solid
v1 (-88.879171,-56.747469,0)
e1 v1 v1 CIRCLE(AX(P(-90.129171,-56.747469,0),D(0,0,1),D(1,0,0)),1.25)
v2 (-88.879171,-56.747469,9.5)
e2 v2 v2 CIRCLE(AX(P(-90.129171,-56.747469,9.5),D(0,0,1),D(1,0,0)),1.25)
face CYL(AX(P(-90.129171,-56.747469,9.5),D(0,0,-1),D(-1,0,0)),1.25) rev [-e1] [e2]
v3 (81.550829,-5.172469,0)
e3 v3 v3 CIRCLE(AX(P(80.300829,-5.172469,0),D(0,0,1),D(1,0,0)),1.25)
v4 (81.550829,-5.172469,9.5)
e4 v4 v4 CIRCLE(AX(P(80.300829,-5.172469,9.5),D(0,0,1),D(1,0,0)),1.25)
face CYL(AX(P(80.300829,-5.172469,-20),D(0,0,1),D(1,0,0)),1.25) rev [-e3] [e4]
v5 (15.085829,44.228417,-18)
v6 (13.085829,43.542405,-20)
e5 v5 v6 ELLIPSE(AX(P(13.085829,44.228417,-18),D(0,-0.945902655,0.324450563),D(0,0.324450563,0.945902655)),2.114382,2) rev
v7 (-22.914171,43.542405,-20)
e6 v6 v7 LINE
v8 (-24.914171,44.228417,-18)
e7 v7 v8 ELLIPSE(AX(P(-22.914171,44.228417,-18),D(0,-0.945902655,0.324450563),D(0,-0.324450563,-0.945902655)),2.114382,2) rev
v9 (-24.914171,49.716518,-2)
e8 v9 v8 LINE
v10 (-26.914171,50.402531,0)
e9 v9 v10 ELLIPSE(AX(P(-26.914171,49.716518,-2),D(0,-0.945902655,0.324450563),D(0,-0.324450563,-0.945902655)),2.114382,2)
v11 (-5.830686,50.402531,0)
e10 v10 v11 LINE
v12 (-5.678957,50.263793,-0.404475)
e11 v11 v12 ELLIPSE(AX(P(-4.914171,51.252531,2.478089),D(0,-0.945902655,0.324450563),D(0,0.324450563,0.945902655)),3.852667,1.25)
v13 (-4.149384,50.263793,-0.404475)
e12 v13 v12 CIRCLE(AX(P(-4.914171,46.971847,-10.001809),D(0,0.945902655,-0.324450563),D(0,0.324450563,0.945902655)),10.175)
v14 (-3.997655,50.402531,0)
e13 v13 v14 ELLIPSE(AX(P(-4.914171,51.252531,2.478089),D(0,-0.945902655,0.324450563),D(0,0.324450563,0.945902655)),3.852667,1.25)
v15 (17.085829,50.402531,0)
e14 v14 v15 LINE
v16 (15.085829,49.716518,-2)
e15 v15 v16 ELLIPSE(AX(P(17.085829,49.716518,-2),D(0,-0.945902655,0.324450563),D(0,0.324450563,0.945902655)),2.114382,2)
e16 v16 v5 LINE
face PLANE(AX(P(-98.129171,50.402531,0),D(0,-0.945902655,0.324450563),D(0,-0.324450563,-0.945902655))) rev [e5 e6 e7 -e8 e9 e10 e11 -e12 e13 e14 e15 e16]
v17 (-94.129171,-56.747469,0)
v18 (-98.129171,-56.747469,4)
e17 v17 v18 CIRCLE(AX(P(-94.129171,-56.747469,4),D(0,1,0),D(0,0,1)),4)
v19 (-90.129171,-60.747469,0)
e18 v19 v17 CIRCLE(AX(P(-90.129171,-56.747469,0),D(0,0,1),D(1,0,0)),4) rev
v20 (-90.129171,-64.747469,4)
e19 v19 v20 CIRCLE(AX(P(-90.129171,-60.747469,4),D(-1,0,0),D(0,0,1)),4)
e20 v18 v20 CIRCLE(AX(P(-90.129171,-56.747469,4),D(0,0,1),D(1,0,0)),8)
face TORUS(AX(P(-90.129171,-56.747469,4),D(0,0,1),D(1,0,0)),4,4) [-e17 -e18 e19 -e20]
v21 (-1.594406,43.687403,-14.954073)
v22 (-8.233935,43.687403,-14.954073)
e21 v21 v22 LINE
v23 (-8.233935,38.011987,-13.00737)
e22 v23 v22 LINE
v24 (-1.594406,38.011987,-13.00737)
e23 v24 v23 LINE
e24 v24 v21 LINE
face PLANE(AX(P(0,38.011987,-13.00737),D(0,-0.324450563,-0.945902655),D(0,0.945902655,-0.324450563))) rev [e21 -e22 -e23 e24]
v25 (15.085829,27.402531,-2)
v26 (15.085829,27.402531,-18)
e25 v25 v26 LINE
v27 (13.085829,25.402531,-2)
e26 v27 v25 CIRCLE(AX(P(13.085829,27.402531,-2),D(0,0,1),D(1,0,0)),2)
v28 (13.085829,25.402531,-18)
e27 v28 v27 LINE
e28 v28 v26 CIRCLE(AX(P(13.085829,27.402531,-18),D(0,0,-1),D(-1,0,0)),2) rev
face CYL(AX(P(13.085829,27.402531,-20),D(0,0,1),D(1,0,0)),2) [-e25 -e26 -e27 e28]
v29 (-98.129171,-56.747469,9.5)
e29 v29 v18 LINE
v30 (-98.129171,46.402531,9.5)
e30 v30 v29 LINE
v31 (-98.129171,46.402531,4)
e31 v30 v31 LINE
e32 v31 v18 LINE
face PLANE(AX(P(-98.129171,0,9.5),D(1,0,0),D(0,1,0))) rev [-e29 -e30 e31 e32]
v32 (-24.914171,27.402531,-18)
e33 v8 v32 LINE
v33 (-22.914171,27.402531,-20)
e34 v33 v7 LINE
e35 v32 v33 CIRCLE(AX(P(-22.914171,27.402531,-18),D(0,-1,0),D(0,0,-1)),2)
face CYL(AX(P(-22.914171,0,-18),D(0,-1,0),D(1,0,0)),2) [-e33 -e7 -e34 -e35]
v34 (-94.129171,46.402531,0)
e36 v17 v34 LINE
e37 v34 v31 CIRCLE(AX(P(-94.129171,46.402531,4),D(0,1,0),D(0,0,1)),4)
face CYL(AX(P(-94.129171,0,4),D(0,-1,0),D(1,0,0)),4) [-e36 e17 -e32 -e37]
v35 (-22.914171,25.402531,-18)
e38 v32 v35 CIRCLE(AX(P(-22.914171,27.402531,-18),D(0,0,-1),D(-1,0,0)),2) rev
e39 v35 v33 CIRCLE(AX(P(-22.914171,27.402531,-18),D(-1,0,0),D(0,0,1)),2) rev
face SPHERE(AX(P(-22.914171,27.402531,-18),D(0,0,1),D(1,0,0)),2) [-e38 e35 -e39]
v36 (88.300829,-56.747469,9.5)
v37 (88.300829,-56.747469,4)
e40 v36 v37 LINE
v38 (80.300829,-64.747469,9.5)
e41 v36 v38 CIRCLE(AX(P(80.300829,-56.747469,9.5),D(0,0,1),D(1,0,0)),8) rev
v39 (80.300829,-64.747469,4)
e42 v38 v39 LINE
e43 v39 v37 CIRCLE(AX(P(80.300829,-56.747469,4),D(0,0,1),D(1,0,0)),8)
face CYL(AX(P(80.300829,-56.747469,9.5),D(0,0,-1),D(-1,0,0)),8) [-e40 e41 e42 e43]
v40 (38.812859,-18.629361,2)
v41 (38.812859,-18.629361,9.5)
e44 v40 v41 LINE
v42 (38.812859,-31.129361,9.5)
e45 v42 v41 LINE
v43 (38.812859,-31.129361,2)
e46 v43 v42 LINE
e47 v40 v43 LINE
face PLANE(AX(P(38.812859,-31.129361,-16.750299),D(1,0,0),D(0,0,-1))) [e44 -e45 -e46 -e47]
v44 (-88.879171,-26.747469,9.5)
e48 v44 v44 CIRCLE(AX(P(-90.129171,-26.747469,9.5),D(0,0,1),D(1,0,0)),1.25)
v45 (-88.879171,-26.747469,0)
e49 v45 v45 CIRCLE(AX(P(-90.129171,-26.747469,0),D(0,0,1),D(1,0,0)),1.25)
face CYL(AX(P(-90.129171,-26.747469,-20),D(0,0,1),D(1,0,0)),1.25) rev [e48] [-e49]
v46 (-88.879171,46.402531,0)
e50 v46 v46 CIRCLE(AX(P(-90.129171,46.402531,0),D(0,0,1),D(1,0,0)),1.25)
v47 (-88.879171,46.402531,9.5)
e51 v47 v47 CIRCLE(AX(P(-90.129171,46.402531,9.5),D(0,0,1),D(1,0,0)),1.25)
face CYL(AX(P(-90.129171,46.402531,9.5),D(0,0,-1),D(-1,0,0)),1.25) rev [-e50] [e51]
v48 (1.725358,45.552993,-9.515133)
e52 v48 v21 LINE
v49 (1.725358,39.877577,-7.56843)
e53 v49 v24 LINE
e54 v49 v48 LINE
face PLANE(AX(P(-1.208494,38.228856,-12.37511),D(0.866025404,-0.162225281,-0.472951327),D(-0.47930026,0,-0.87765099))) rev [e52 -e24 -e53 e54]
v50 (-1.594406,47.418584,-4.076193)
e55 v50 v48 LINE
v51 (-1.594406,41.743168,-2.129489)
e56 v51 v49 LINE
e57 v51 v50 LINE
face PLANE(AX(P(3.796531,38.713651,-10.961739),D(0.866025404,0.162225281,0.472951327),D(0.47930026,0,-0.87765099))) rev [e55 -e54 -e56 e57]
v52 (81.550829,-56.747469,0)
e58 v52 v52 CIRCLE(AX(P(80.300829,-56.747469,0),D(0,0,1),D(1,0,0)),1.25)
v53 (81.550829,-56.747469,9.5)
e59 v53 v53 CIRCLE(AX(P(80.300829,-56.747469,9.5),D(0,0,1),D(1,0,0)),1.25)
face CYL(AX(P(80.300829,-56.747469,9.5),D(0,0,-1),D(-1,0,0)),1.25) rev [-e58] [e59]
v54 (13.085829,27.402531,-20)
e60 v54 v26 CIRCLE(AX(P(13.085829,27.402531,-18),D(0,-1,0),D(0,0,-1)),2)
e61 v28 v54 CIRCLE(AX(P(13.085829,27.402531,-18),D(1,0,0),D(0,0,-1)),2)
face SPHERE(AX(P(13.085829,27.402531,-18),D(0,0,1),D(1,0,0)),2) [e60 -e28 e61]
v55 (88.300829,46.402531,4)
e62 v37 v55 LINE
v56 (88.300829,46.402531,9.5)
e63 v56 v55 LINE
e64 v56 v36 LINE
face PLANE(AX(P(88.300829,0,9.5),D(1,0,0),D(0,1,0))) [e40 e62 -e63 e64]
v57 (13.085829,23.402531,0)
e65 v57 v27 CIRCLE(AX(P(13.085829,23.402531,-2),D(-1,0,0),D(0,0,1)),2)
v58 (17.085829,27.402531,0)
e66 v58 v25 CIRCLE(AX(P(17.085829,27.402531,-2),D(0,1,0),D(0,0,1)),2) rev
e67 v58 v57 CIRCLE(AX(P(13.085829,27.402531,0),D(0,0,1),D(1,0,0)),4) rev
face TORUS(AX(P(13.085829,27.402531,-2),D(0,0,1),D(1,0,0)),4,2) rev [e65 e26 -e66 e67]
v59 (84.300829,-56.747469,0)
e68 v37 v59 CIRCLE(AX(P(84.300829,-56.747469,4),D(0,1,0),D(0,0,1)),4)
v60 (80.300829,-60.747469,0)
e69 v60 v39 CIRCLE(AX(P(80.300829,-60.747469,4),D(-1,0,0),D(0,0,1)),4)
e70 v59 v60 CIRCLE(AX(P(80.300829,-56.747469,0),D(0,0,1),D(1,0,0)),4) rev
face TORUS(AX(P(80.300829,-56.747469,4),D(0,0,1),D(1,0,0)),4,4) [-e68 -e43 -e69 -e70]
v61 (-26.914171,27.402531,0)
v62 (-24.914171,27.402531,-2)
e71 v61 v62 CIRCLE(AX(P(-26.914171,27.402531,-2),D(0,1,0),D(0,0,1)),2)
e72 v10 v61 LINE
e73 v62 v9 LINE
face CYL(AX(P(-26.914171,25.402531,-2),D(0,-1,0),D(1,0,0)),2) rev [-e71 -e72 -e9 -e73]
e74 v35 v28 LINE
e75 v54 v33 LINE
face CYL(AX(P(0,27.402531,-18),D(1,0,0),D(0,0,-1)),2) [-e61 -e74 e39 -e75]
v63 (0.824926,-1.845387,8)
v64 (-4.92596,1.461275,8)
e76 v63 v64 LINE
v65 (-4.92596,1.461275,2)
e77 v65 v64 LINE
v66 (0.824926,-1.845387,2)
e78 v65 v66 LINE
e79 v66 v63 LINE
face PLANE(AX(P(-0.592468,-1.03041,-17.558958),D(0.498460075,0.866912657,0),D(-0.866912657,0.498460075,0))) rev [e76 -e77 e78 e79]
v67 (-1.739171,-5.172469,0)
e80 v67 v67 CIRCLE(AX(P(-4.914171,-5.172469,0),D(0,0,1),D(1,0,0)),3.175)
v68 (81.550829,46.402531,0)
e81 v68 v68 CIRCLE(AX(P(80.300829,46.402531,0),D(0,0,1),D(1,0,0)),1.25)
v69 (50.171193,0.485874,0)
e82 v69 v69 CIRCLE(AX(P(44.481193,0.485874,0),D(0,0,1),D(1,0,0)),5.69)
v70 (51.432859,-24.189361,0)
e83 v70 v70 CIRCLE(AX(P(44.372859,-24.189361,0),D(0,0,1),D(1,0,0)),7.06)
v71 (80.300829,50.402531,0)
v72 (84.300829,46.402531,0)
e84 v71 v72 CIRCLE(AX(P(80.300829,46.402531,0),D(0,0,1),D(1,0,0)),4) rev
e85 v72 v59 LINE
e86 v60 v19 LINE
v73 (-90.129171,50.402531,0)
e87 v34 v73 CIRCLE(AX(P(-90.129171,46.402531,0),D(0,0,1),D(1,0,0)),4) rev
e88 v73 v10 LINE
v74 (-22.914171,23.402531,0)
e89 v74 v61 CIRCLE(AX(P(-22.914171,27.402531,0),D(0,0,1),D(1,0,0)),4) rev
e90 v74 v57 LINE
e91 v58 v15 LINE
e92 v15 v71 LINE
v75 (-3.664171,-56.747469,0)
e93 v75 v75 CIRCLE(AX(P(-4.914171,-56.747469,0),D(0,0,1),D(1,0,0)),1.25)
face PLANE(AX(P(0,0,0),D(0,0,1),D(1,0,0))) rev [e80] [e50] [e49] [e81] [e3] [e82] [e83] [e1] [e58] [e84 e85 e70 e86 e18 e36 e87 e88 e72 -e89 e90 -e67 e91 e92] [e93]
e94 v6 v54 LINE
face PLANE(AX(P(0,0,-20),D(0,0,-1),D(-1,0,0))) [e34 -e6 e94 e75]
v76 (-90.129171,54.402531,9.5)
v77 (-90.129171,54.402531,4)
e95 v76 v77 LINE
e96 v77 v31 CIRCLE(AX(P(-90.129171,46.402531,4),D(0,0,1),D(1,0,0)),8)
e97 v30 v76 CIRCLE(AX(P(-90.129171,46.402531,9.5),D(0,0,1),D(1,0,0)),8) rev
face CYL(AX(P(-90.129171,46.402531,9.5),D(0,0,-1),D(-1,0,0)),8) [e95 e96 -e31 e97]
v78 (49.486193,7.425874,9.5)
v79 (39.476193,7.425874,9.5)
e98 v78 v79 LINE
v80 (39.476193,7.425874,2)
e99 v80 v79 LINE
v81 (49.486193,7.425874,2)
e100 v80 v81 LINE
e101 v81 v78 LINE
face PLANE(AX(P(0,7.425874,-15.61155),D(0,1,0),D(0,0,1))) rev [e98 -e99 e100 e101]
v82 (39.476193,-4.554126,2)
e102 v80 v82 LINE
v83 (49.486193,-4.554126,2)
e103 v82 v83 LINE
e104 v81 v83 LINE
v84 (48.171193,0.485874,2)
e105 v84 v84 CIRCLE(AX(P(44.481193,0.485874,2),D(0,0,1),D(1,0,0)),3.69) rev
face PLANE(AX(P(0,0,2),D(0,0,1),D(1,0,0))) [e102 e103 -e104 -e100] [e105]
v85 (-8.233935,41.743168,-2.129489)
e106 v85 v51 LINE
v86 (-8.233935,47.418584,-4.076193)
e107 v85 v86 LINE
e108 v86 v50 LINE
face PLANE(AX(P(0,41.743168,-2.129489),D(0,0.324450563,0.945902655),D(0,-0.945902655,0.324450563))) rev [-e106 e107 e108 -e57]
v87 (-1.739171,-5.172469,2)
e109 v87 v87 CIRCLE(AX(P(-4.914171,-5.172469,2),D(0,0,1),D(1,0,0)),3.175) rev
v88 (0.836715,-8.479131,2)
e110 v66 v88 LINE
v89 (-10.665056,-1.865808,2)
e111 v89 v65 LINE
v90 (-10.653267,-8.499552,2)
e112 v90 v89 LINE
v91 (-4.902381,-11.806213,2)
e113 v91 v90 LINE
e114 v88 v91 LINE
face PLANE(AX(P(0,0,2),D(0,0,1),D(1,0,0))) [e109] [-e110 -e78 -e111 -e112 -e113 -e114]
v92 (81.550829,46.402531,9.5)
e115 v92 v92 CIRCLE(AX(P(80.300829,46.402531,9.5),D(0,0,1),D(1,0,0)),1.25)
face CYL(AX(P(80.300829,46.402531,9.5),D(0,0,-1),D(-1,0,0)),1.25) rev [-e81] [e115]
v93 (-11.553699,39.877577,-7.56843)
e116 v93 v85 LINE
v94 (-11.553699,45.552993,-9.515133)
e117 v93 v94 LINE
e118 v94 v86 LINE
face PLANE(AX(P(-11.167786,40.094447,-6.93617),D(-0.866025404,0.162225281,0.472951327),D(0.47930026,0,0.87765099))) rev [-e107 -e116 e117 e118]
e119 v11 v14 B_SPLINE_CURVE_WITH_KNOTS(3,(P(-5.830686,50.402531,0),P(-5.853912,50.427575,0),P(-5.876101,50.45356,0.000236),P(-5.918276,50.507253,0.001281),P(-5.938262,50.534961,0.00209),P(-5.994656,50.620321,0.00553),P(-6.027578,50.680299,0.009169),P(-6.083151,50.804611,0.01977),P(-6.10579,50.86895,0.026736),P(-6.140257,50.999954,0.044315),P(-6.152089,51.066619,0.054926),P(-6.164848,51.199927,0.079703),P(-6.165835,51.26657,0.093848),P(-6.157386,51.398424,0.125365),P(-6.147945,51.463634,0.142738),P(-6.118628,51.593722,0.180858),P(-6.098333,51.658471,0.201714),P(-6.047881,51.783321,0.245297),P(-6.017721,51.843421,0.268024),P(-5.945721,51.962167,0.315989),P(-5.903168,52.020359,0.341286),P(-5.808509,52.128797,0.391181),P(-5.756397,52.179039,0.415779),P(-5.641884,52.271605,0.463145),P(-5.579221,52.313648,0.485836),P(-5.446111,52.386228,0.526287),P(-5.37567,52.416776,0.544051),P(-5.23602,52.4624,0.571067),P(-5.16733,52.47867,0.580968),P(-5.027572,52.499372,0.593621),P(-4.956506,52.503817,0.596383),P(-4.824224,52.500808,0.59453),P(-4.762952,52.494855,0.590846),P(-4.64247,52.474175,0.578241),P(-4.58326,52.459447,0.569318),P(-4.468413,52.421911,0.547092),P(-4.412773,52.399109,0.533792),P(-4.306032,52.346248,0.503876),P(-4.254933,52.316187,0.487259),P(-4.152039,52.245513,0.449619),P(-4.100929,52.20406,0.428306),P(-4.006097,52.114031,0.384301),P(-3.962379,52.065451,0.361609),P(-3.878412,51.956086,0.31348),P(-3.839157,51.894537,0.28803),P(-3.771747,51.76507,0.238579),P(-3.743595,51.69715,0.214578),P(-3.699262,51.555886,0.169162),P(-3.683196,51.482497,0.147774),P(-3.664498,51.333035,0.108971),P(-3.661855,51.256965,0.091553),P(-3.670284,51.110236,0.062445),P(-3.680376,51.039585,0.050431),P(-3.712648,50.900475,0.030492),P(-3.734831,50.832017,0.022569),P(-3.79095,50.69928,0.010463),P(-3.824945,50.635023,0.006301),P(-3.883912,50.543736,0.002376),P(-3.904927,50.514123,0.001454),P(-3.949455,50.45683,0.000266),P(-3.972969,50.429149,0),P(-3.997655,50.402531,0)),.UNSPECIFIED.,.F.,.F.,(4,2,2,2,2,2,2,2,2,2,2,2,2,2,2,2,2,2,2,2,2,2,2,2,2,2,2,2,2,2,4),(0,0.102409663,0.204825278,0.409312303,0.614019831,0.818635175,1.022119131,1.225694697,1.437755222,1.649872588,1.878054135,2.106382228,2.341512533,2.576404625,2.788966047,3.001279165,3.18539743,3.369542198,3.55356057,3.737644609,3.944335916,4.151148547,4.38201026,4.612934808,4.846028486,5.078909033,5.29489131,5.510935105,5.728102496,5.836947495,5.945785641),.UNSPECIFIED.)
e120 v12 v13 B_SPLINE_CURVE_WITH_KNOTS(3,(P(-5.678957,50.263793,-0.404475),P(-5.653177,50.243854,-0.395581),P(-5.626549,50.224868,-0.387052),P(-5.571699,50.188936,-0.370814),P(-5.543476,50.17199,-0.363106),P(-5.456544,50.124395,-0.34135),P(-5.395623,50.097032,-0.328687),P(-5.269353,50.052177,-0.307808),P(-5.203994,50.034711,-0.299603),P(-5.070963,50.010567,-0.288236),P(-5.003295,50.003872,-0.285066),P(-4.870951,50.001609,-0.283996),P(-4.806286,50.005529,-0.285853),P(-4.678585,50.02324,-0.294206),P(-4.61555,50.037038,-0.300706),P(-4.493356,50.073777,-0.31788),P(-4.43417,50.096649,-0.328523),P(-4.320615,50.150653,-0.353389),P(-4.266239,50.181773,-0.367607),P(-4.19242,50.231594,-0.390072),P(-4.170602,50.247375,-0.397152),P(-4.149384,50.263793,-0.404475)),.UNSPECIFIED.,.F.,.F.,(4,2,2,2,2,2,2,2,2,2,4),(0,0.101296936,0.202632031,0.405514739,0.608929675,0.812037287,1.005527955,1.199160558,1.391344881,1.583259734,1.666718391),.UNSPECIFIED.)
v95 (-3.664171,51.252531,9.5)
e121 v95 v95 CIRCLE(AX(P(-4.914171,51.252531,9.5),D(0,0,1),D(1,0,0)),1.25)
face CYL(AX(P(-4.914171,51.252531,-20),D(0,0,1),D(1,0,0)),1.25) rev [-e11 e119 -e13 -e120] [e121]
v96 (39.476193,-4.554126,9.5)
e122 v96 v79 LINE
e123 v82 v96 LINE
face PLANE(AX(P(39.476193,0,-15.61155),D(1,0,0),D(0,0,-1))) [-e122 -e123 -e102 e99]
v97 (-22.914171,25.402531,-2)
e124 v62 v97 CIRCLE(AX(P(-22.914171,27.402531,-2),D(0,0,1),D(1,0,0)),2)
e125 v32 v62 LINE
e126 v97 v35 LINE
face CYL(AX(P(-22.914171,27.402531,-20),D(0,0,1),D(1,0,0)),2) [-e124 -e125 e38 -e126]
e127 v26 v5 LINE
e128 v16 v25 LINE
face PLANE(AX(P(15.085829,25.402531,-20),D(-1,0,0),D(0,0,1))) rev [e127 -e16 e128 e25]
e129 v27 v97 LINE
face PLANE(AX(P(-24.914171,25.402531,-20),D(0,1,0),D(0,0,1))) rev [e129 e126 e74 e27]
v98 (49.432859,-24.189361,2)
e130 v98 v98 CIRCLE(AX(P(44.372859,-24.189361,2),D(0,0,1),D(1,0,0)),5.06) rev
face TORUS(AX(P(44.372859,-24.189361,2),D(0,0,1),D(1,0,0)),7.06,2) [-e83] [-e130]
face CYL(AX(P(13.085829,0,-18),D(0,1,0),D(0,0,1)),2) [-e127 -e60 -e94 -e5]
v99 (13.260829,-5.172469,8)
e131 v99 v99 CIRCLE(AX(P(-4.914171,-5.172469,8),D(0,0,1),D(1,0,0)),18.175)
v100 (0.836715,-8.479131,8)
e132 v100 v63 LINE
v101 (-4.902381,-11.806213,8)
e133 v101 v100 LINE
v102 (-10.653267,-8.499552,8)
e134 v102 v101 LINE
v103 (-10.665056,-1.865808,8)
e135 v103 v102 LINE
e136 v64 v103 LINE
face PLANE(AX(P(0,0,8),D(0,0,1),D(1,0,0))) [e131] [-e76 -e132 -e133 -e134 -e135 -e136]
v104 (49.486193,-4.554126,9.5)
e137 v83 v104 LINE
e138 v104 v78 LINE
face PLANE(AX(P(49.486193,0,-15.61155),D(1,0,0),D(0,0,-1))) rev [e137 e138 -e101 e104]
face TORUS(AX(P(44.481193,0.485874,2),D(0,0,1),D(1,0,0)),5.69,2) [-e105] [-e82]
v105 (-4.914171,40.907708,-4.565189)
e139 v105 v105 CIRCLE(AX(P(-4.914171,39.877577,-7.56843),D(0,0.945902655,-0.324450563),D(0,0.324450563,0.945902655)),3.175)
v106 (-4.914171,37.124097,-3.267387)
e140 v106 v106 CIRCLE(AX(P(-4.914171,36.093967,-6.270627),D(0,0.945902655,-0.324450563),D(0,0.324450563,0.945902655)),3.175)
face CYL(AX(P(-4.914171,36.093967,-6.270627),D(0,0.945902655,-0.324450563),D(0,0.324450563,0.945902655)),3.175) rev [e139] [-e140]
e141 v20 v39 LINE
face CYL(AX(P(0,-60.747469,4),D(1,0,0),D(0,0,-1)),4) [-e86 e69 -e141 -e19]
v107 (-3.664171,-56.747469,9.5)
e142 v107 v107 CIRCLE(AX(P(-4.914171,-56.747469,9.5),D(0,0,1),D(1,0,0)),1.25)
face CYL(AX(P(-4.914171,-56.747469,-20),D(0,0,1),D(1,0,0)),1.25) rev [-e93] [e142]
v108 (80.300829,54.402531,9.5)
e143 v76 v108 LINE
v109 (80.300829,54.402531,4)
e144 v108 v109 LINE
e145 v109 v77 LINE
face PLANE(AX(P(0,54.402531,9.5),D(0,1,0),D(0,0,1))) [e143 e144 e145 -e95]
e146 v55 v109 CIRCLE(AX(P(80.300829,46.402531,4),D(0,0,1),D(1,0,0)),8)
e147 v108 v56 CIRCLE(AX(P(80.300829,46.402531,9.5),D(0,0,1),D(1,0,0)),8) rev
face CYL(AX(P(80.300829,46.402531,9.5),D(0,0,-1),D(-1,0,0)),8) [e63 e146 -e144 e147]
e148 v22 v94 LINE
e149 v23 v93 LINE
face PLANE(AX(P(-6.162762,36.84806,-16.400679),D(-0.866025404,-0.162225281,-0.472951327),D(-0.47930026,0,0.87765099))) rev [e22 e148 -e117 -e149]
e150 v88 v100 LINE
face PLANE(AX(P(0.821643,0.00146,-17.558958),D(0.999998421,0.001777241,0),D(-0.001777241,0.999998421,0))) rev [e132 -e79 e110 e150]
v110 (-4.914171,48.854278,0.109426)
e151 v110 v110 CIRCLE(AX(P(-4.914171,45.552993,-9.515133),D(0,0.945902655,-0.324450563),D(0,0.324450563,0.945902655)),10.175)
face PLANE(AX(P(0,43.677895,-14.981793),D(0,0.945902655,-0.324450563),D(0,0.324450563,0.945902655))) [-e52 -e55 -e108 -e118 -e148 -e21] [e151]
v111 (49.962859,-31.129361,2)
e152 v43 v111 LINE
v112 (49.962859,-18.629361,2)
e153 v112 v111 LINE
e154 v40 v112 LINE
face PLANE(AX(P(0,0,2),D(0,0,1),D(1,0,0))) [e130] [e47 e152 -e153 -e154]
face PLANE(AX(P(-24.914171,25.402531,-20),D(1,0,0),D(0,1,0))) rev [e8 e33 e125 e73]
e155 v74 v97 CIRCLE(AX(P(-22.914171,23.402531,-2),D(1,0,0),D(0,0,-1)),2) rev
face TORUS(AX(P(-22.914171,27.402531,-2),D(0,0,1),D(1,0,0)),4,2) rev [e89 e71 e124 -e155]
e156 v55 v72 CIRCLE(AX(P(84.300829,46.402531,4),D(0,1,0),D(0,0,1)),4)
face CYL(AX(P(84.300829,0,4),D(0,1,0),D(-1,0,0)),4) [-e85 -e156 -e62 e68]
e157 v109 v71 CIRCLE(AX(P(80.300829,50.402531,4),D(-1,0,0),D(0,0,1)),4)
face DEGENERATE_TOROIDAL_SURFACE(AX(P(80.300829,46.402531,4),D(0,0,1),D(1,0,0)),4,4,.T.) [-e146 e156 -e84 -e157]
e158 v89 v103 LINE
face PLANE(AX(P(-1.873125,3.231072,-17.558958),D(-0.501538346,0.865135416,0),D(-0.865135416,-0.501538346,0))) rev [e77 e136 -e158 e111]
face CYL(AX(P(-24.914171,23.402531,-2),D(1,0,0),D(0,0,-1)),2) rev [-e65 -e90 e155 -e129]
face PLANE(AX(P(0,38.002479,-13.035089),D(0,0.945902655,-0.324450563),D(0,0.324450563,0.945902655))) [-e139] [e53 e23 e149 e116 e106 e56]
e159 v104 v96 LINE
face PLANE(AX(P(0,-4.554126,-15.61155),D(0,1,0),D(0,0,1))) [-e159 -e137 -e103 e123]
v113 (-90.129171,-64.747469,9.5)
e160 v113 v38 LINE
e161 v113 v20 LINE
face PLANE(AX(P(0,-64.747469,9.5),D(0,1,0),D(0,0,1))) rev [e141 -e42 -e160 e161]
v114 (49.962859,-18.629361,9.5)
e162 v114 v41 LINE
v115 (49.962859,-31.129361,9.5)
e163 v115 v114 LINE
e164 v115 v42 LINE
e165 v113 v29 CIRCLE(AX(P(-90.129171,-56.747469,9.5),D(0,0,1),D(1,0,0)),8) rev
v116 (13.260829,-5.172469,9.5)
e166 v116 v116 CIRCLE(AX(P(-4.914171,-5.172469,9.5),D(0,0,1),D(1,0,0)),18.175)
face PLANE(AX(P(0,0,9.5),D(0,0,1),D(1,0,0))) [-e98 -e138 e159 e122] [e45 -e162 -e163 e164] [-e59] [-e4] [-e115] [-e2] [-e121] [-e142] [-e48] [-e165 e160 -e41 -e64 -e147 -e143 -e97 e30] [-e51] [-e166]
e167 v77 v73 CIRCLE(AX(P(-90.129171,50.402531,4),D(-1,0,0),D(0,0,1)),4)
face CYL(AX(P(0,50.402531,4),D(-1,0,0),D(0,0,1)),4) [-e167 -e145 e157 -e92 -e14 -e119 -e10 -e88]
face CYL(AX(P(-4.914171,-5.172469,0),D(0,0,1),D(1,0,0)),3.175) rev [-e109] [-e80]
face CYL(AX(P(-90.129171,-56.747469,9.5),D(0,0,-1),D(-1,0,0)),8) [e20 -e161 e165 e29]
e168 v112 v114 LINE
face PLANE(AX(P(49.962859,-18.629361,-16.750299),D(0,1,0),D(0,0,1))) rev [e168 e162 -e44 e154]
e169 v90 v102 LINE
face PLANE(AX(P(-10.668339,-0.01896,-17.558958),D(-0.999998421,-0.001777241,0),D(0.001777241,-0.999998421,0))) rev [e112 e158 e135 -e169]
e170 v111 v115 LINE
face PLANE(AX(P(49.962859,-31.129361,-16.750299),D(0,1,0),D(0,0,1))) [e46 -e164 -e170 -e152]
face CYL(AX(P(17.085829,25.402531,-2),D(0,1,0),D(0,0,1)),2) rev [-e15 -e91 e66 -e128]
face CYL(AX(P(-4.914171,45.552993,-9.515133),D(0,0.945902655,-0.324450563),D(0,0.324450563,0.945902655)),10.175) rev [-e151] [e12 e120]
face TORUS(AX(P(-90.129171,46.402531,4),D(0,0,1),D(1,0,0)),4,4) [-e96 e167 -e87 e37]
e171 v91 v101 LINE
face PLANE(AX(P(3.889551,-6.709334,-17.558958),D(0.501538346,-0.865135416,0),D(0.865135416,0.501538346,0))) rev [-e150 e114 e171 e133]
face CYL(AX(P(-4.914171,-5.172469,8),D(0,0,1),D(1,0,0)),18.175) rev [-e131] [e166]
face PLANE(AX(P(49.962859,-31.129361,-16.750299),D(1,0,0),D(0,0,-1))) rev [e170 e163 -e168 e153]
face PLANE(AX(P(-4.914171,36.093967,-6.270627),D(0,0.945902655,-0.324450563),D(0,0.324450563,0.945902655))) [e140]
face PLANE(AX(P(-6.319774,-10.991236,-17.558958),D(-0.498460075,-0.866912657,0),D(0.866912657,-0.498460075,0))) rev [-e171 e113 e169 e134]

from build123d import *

# Parameters (mm, degrees)
SKETCH1_R            = 1.25
SKETCH1_W            = 156.43
SKETCH1_H            = 89.15
SKETCH1_W_2          = 17.19
SKETCH1_H_2          = 1
SKETCH1_H_3          = 0.5
SKETCH1_W_3          = 1
SKETCH1_H_4          = 11.97
SKETCH1_W_4          = 0.5
SKETCH1_W_5          = 2
BOSS_EXTRUDE3_DEPTH  = 9.5
FILLET2_R            = 4
SKETCH9_R            = 5.06
CUT_EXTRUDE5_DEPTH   = 118.948373888
SKETCH9_3_W          = 11.15
SKETCH9_3_H          = 12.5
CUT_EXTRUDE6_DEPTH   = 7.5
SKETCH10_R           = 3.69
SKETCH10_R_2         = 3.19
CUT_EXTRUDE7_DEPTH   = 118.948373888
SKETCH10_3_W         = 10.01
SKETCH10_3_H         = 11.98
SKETCH10_3_W_2       = 9.01
SKETCH10_3_H_2       = 10.98
SKETCH10_3_R         = 3.69
CUT_EXTRUDE8_DEPTH   = 7.5
FILLET3_R            = 2
SKETCH12_R           = 3.175
CUT_EXTRUDE9_DEPTH   = 118.948373888
SKETCH12_3_R         = 3.175
CUT_EXTRUDE10_DEPTH  = 7.5
SKETCH12_4_R         = 18.175
CUT_EXTRUDE11_DEPTH  = 1.5
SKETCH13_W           = 40
SKETCH13_H           = 25
BOSS_EXTRUDE10_DEPTH = 20
CUT_EXTRUDE12_DEPTH  = 132.946470296
SKETCH15_R           = 10.175
SKETCH15_R_2         = 3.175
CUT_EXTRUDE13_DEPTH  = 1.5
CUT_EXTRUDE14_START  = -1.5
SKETCH15_3_R         = 3.175
CUT_EXTRUDE14_DEPTH  = 6
CUT_EXTRUDE15_START  = -7.5
SKETCH15_5_R         = 3.175
CUT_EXTRUDE15_DEPTH  = 4
SKETCH16_R           = 1.25
CUT_EXTRUDE16_DEPTH  = 122.209813559
FILLET4_R            = 2


# Some blends are built 0.0001 mm under size
with BuildPart() as part:
    # Sketch1 → Boss-Extrude3 (new body)
    # profile 1 of 11: a face of its own
    with BuildSketch(Plane.XY):
        with BuildLine():
            ThreePointArc((-90.129170507, 54.402530662), (-95.786024756, 52.059384912), (-98.129170507, 46.402530662))
            Line((-98.129170507, 46.402530662), (-98.129170507, -56.747469338))
            ThreePointArc((-98.129170507, -56.747469338), (-95.786024756, -62.404323587), (-90.129170507, -64.747469338))
            Line((-90.129170507, -64.747469338), (80.300829493, -64.747469338))
            ThreePointArc((80.300829493, -64.747469338), (85.957683743, -62.404323587), (88.300829493, -56.747469338))
            Line((88.300829493, -56.747469338), (88.300829493, 46.402530662))
            ThreePointArc((88.300829493, 46.402530662), (85.957683743, 52.059384912), (80.300829493, 54.402530662))
            Line((80.300829493, 54.402530662), (-90.129170507, 54.402530662))
        make_face()
        with Locations((-90.129170507, -56.747469338)):
            Circle(SKETCH1_R, mode=Mode.SUBTRACT)
        with Locations((80.300829493, -56.747469338)):
            Circle(SKETCH1_R, mode=Mode.SUBTRACT)
        with BuildLine():
            Line((-89.239170507, -53.907469338), (-89.239170507, 45.524806332))
            ThreePointArc((-89.239170507, 45.524806332), (-91.378326538, 46.448456797), (-89.177120088, 47.212530662))
            Line((-89.177120088, 47.212530662), (-38.909170507, 47.212530662))
            Line((-38.909170507, 47.212530662), (-38.909170507, 48.212530662))
            Line((-38.909170507, 48.212530662), (-21.719170507, 48.212530662))
            Line((-21.719170507, 48.212530662), (-21.719170507, 47.212530662))
            Line((-21.719170507, 47.212530662), (76.680829493, 47.212530662))
            Line((76.680829493, 47.212530662), (76.680829493, -0.147469338))
            Line((76.680829493, -0.147469338), (77.680829493, -0.147469338))
            Line((77.680829493, -0.147469338), (77.680829493, -12.117469338))
            Line((77.680829493, -12.117469338), (76.680829493, -12.117469338))
            Line((76.680829493, -12.117469338), (76.680829493, -53.907469338))
            Line((76.680829493, -53.907469338), (-89.239170507, -53.907469338))
        make_face(mode=Mode.SUBTRACT)
        with Locations((80.300829493, 46.402530662)):
            Circle(SKETCH1_R, mode=Mode.SUBTRACT)
    # profile 2 of 11: a face of its own
    with BuildSketch(Plane.XY):
        with BuildLine():
            ThreePointArc((-88.879170507, 46.402530662), (-88.972667156, 45.928189013), (-89.239170507, 45.524806332))
            Line((-89.239170507, 45.524806332), (-89.239170507, -53.907469338))
            Line((-89.239170507, -53.907469338), (76.680829493, -53.907469338))
            Line((76.680829493, -53.907469338), (76.680829493, -12.117469338))
            Line((76.680829493, -12.117469338), (76.180829493, -12.117469338))
            Line((76.180829493, -12.117469338), (76.180829493, -53.407469338))
            Line((76.180829493, -53.407469338), (-88.739170507, -53.407469338))
            Line((-88.739170507, -53.407469338), (-88.739170507, 46.712530662))
            Line((-88.739170507, 46.712530662), (-38.909170507, 46.712530662))
            Line((-38.909170507, 46.712530662), (-38.909170507, 47.212530662))
            Line((-38.909170507, 47.212530662), (-89.177120088, 47.212530662))
            ThreePointArc((-89.177120088, 47.212530662), (-88.956020256, 46.834061065), (-88.879170507, 46.402530662))
        make_face()
    # profile 3 of 11: a face of its own
    with BuildSketch(Plane.XY):
        Polygon((-38.909170507, 46.212530662), (-38.909170507, 46.712530662), (-88.739170507, 46.712530662), (-88.739170507, -53.407469338), (76.180829493, -53.407469338), (76.180829493, -12.117469338), (74.180829493, -12.117469338), (74.180829493, -0.147469338), (76.180829493, -0.147469338), (76.180829493, 46.712530662), (-21.719170507, 46.712530662), (-21.719170507, 46.212530662), align=None)
        with Locations((-4.914170507, -5.172469338)):
            Rectangle(SKETCH1_W, SKETCH1_H, mode=Mode.SUBTRACT)
    # profile 4 of 11: a face of its own
    with BuildSketch(Plane.XY):
        with Locations((-4.914170507, -5.172469338)):
            Rectangle(SKETCH1_W, SKETCH1_H)
    # profile 5 of 11: a face of its own
    with BuildSketch(Plane.XY):
        Polygon((76.680829493, 47.212530662), (-21.719170507, 47.212530662), (-21.719170507, 46.712530662), (76.180829493, 46.712530662), (76.180829493, -0.147469338), (76.680829493, -0.147469338), align=None)
    # profile 6 of 11: a face of its own
    with BuildSketch(Plane.XY):
        with Locations((-30.314170507, 47.712530662)):
            Rectangle(SKETCH1_W_2, SKETCH1_H_2)
    # profile 7 of 11: a face of its own
    with BuildSketch(Plane.XY):
        with Locations((-30.314170507, 46.962530662)):
            Rectangle(SKETCH1_W_2, SKETCH1_H_3)
    # profile 8 of 11: a face of its own
    with BuildSketch(Plane.XY):
        with Locations((-30.314170507, 46.462530662)):
            Rectangle(SKETCH1_W_2, SKETCH1_H_3)
    # profile 9 of 11: a face of its own
    with BuildSketch(Plane.XY):
        with Locations((77.180829493, -6.132469338)):
            Rectangle(SKETCH1_W_3, SKETCH1_H_4)
    # profile 10 of 11: a face of its own
    with BuildSketch(Plane.XY):
        with Locations((76.430829493, -6.132469338)):
            Rectangle(SKETCH1_W_4, SKETCH1_H_4)
    # profile 11 of 11: a face of its own
    with BuildSketch(Plane.XY):
        with Locations((75.180829493, -6.132469338)):
            Rectangle(SKETCH1_W_5, SKETCH1_H_4)
    extrude(amount=BOSS_EXTRUDE3_DEPTH)

    # Fillet2
    fillet2_edges = [part.edges().sort_by_distance(p)[0] for p in [
        (88.300829493, -5.172469338, 0),
        (85.957683743, -62.404323587, 0),
        (-4.914170507, -64.747469338, 0),
        (-95.786024756, -62.404323587, 0),
        (-98.129170507, -5.172469338, 0),
        (-95.786024756, 52.059384912, 0),
        (-4.914170507, 54.402530662, 0),
        (85.957683743, 52.059384912, 0),
    ]]
    fillet(fillet2_edges, radius=FILLET2_R)

    # Sketch9 → Cut-Extrude5 (cut, through all)
    with BuildSketch(Plane.XY.offset(9.5)):
        with Locations((44.372859259, -24.18936125)):
            Circle(SKETCH9_R)
    extrude(amount=-CUT_EXTRUDE5_DEPTH, mode=Mode.SUBTRACT)

    # Sketch9<3> → Cut-Extrude6 (cut)
    with BuildSketch(Plane.XY.offset(9.5)):
        with Locations((44.387859259, -24.87936125)):
            Rectangle(SKETCH9_3_W, SKETCH9_3_H)
    extrude(amount=-CUT_EXTRUDE6_DEPTH, mode=Mode.SUBTRACT)

    # Sketch10 → Cut-Extrude7 (cut, through all)
    # profile 1 of 2: a face of its own
    with BuildSketch(Plane.XY.offset(9.5)):
        with Locations((44.481193334, 0.485874053)):
            Circle(SKETCH10_R)
        with Locations((44.481193334, 0.485874053)):
            Circle(SKETCH10_R_2, mode=Mode.SUBTRACT)
    # profile 2 of 2: a face of its own
    with BuildSketch(Plane.XY.offset(9.5)):
        with Locations((44.481193334, 0.485874053)):
            Circle(SKETCH10_R_2)
    extrude(amount=-CUT_EXTRUDE7_DEPTH, mode=Mode.SUBTRACT)

    # Sketch10<3> → Cut-Extrude8 (cut)
    # profile 1 of 2: a face of its own
    with BuildSketch(Plane.XY.offset(9.5)):
        with Locations((44.481193334, 1.435874053)):
            Rectangle(SKETCH10_3_W, SKETCH10_3_H)
        with Locations((44.481193334, 1.435874053)):
            Rectangle(SKETCH10_3_W_2, SKETCH10_3_H_2, mode=Mode.SUBTRACT)
    # profile 2 of 2: a face of its own
    with BuildSketch(Plane.XY.offset(9.5)):
        with Locations((44.481193334, 1.435874053)):
            Rectangle(SKETCH10_3_W_2, SKETCH10_3_H_2)
        with Locations((44.481193334, 0.485874053)):
            Circle(SKETCH10_3_R, mode=Mode.SUBTRACT)
    extrude(amount=-CUT_EXTRUDE8_DEPTH, mode=Mode.SUBTRACT)

    # Fillet3
    fillet3_edges = [part.edges().sort_by_distance(p)[0] for p in [
        (39.312859259, -24.18936125, 0),
        (40.791193334, 0.485874053, 0),
    ]]
    fillet(fillet3_edges, radius=FILLET3_R - 0.0001)  # a hair under: the kernel refuses the full size

    # Sketch12 → Cut-Extrude9 (cut, through all)
    with BuildSketch(Plane.XY.offset(9.5)):
        with Locations((-4.914170507, -5.172469338)):
            Circle(SKETCH12_R)
    extrude(amount=-CUT_EXTRUDE9_DEPTH, mode=Mode.SUBTRACT)

    # Sketch12<3> → Cut-Extrude10 (cut)
    # profile 1 of 2: a face of its own
    with BuildSketch(Plane.XY.offset(9.5)):
        Polygon((-10.653266544, -8.499551645), (-4.902380726, -11.806213454), (0.83671531, -8.479131146), (0.82492553, -1.84538703), (-4.925960287, 1.461274779), (-10.665056324, -1.865807529), align=None)
        Polygon((-4.902893772, -11.517538775), (0.586459182, -8.335238117), (0.575182447, -1.990168679), (-4.925447242, 1.1726001), (-10.414800196, -2.009700558), (-10.403523461, -8.354769996), align=None, mode=Mode.SUBTRACT)
    # profile 2 of 2: a face of its own
    with BuildSketch(Plane.XY.offset(9.5)):
        Polygon((-10.403523461, -8.354769996), (-4.902893772, -11.517538775), (0.586459182, -8.335238117), (0.575182447, -1.990168679), (-4.925447242, 1.1726001), (-10.414800196, -2.009700558), align=None)
        with Locations((-4.914170507, -5.172469338)):
            Circle(SKETCH12_3_R, mode=Mode.SUBTRACT)
    extrude(amount=-CUT_EXTRUDE10_DEPTH, mode=Mode.SUBTRACT)

    # Sketch12<4> → Cut-Extrude11 (cut)
    with BuildSketch(Plane.XY.offset(9.5)):
        with Locations((-4.914170507, -5.172469338)):
            Circle(SKETCH12_4_R)
        Polygon((-4.902380726, -11.806213454), (0.83671531, -8.479131146), (0.82492553, -1.84538703), (-4.925960287, 1.461274779), (-10.665056324, -1.865807529), (-10.653266544, -8.499551645), align=None, mode=Mode.SUBTRACT)
    extrude(amount=-CUT_EXTRUDE11_DEPTH, mode=Mode.SUBTRACT)

    # Sketch13 → Boss-Extrude10 (add)
    with BuildSketch(Plane(origin=(0, 0, 0), x_dir=(-1, 0, 0), z_dir=(0, 0, -1))):
        with Locations((4.914170507, 37.902530662)):
            Rectangle(SKETCH13_W, SKETCH13_H)
    extrude(amount=BOSS_EXTRUDE10_DEPTH)

    # Sketch14 → Cut-Extrude12 (cut, through all)
    with BuildSketch(Plane(origin=(15.085829493, 0, 0), x_dir=(0, 0, -1), z_dir=(1, 0, 0))):
        Polygon((0, 50.402530662), (20, 43.542404813), (20, 50.402530662), align=None)
    extrude(amount=-CUT_EXTRUDE12_DEPTH, mode=Mode.SUBTRACT)

    # Sketch15 → Cut-Extrude13 (cut)
    # profile 1 of 4: a face of its own
    with BuildSketch(Plane(origin=(0, 45.096748617, -15.468468545), x_dir=(1, 0, 0), z_dir=(0, 0.9459026548151281, -0.32445056266508826))):
        with Locations(Location((-4.914170507, -5.779304645, 0), (0, 0, 270))):
            Circle(SKETCH15_R)
        Polygon((-1.594406459, -11.529304645), (1.725357589, -5.779304645), (-1.594406459, -0.029304645), (-8.233934555, -0.029304645), (-11.553698603, -5.779304645), (-8.233934555, -11.529304645), align=None, mode=Mode.SUBTRACT)
    # profile 2 of 4: a face of its own
    with BuildSketch(Plane(origin=(0, 45.096748617, -15.468468545), x_dir=(1, 0, 0), z_dir=(0, 0.9459026548151281, -0.32445056266508826))):
        Polygon((-8.233934555, -11.529304645), (-1.594406459, -11.529304645), (1.725357589, -5.779304645), (-1.594406459, -0.029304645), (-8.233934555, -0.029304645), (-11.553698603, -5.779304645), align=None)
        Polygon((-1.738744026, -11.279304645), (1.436682454, -5.779304645), (-1.738744026, -0.279304645), (-8.089596987, -0.279304645), (-11.265023468, -5.779304645), (-8.089596987, -11.279304645), align=None, mode=Mode.SUBTRACT)
    # profile 3 of 4: a face of its own
    with BuildSketch(Plane(origin=(0, 45.096748617, -15.468468545), x_dir=(1, 0, 0), z_dir=(0, 0.9459026548151281, -0.32445056266508826))):
        Polygon((-8.089596987, -11.279304645), (-1.738744026, -11.279304645), (1.436682454, -5.779304645), (-1.738744026, -0.279304645), (-8.089596987, -0.279304645), (-11.265023468, -5.779304645), align=None)
        with Locations((-4.914170507, -5.779304645)):
            Circle(SKETCH15_R_2, mode=Mode.SUBTRACT)
    # profile 4 of 4: a face of its own
    with BuildSketch(Plane(origin=(0, 45.096748617, -15.468468545), x_dir=(1, 0, 0), z_dir=(0, 0.9459026548151281, -0.32445056266508826))):
        with Locations((-4.914170507, -5.779304645)):
            Circle(SKETCH15_R_2)
    extrude(amount=-CUT_EXTRUDE13_DEPTH, mode=Mode.SUBTRACT)

    # Sketch15<3> → Cut-Extrude14 (cut)
    # profile 1 of 3: a face of its own
    with BuildSketch(Plane(origin=(0, 45.096748617, -15.468468545), x_dir=(1, 0, 0), z_dir=(0, 0.9459026548151281, -0.32445056266508826)).offset(CUT_EXTRUDE14_START)):
        Polygon((-8.233934555, -11.529304645), (-1.594406459, -11.529304645), (1.725357589, -5.779304645), (-1.594406459, -0.029304645), (-8.233934555, -0.029304645), (-11.553698603, -5.779304645), align=None)
        Polygon((-1.738744026, -11.279304645), (1.436682454, -5.779304645), (-1.738744026, -0.279304645), (-8.089596987, -0.279304645), (-11.265023468, -5.779304645), (-8.089596987, -11.279304645), align=None, mode=Mode.SUBTRACT)
    # profile 2 of 3: a face of its own
    with BuildSketch(Plane(origin=(0, 45.096748617, -15.468468545), x_dir=(1, 0, 0), z_dir=(0, 0.9459026548151281, -0.32445056266508826)).offset(CUT_EXTRUDE14_START)):
        Polygon((-8.089596987, -11.279304645), (-1.738744026, -11.279304645), (1.436682454, -5.779304645), (-1.738744026, -0.279304645), (-8.089596987, -0.279304645), (-11.265023468, -5.779304645), align=None)
        with Locations((-4.914170507, -5.779304645)):
            Circle(SKETCH15_3_R, mode=Mode.SUBTRACT)
    # profile 3 of 3: a face of its own
    with BuildSketch(Plane(origin=(0, 45.096748617, -15.468468545), x_dir=(1, 0, 0), z_dir=(0, 0.9459026548151281, -0.32445056266508826)).offset(CUT_EXTRUDE14_START)):
        with Locations((-4.914170507, -5.779304645)):
            Circle(SKETCH15_3_R)
    extrude(amount=-CUT_EXTRUDE14_DEPTH, mode=Mode.SUBTRACT)

    # Sketch15<5> → Cut-Extrude15 (cut)
    with BuildSketch(Plane(origin=(0, 45.096748617, -15.468468545), x_dir=(1, 0, 0), z_dir=(0, 0.9459026548151281, -0.32445056266508826)).offset(CUT_EXTRUDE15_START)):
        with Locations(Location((-4.914170507, -5.779304645, 0), (0, 0, 270))):
            Circle(SKETCH15_5_R)
    extrude(amount=-CUT_EXTRUDE15_DEPTH, mode=Mode.SUBTRACT)

    # Sketch16 → Cut-Extrude16 (cut, through all)
    with BuildSketch(Plane.XY.offset(9.5)):
        with Locations((-4.914170507, -56.747469338)):
            Circle(SKETCH16_R)
        with Locations((80.300829493, -5.172469338)):
            Circle(SKETCH16_R)
        with Locations((-4.914170507, 51.252530662)):
            Circle(SKETCH16_R)
        with Locations((-90.129170507, -26.747469338)):
            Circle(SKETCH16_R)
    extrude(amount=-CUT_EXTRUDE16_DEPTH, mode=Mode.SUBTRACT)

    # Fillet4
    # the kernel refuses this fillet: 2 mm, written as the material it takes off along each edge
    with BuildSketch(Plane(origin=(-22.914170507, 27.402530662, -18), x_dir=(0, -1, 0), z_dir=(0, 0, -1))) as fillet4_piece_1_section:
        Polygon((0, 0), (FILLET4_R, 0), (FILLET4_R, FILLET4_R), (0, FILLET4_R), align=None)
    fillet4_piece_1 = extrude(amount=FILLET4_R, mode=Mode.PRIVATE)
    fillet4_piece_1 = fillet4_piece_1 - Plane(origin=(-22.914170507, 27.402530662, -18), x_dir=(0.7071067811865476, 0.7071067811865474, 0), z_dir=(0, 0, -1)) * Sphere(FILLET4_R, mode=Mode.PRIVATE)
    add(fillet4_piece_1, mode=Mode.SUBTRACT)
    with BuildSketch(Plane(origin=(13.085829493, 27.402530662, -18), x_dir=(1, 0, 0), z_dir=(0, 0, -1))) as fillet4_piece_2_section:
        Polygon((0, 0), (FILLET4_R, 0), (FILLET4_R, FILLET4_R), (0, FILLET4_R), align=None)
    fillet4_piece_2 = extrude(amount=FILLET4_R, mode=Mode.PRIVATE)
    fillet4_piece_2 = fillet4_piece_2 - Plane(origin=(13.085829493, 27.402530662, -18), x_dir=(-0.7071067811865475, 0.7071067811865475, 0), z_dir=(0, 0, -1)) * Sphere(FILLET4_R, mode=Mode.PRIVATE)
    add(fillet4_piece_2, mode=Mode.SUBTRACT)
    with BuildSketch(Plane(origin=(-24.914170507, 25.402530662, 0), x_dir=(1, 0, 0), z_dir=(0, 0, -1)), Plane(origin=(15.085829493, 25.402530662, 0), x_dir=(0, 1, 0), z_dir=(0, 0, -1))) as fillet4_piece_3:
        with BuildLine():
            CenterArc((FILLET4_R, -FILLET4_R), FILLET4_R, 90, 90)
            Line((0, -FILLET4_R), (0, 0))
            Line((0, 0), (FILLET4_R, 0))
        make_face()
    extrude(amount=18, mode=Mode.SUBTRACT)
    with BuildSketch(Plane(origin=(-24.914170507, 48.542404813, -20), x_dir=(0, 0, 1), z_dir=(0, -1, 0)), Plane(origin=(15.085829493, 27.402530662, -20), x_dir=(0, 0, 1), z_dir=(0, 1, 0))) as fillet4_piece_4:
        with BuildLine():
            CenterArc((FILLET4_R, -FILLET4_R), FILLET4_R, 90, 90)
            Line((0, -FILLET4_R), (0, 0))
            Line((0, 0), (FILLET4_R, 0))
        make_face()
    extrude(amount=21.139874151, mode=Mode.SUBTRACT)
    with BuildSketch(Plane(origin=(-22.914170507, 25.402530662, -20), x_dir=(0, 0, 1), z_dir=(1, 0, 0))) as fillet4_piece_5:
        with BuildLine():
            CenterArc((FILLET4_R, -FILLET4_R), FILLET4_R, 90, 90)
            Line((0, -FILLET4_R), (0, 0))
            Line((0, 0), (FILLET4_R, 0))
        make_face()
    extrude(amount=36, mode=Mode.SUBTRACT)
    # the kernel refuses this fillet: 2 mm, written as the material it adds along each edge
    with BuildSketch(Plane(origin=(-24.914170507, 55.402530662, 0), x_dir=(-1, 0, 0), z_dir=(0, -1, 0))) as fillet4_2_piece_1_section:
        with BuildLine():
            CenterArc((FILLET4_R, FILLET4_R), FILLET4_R, 180, 90)
            Line((0, FILLET4_R), (0, 0))
            Line((0, 0), (FILLET4_R, 0))
        make_face()
    fillet4_2_piece_1 = extrude(amount=28, mode=Mode.PRIVATE)
    fillet4_2_piece_1 = split(fillet4_2_piece_1, bisect_by=Plane(origin=(-25.368609753, 49.045718482, -3.955648076), z_dir=(0, -0.9459026548151283, 0.3244505626650883)), keep=Keep.TOP, mode=Mode.PRIVATE)
    add(fillet4_2_piece_1)
    with BuildSketch(Plane(origin=(15.085829493, 27.402530662, 0), x_dir=(1, 0, 0), z_dir=(0, 1, 0))) as fillet4_2_piece_2_section:
        with BuildLine():
            CenterArc((FILLET4_R, FILLET4_R), FILLET4_R, 180, 90)
            Line((0, FILLET4_R), (0, 0))
            Line((0, 0), (FILLET4_R, 0))
        make_face()
    fillet4_2_piece_2 = extrude(amount=28, mode=Mode.PRIVATE)
    fillet4_2_piece_2 = split(fillet4_2_piece_2, bisect_by=Plane(origin=(15.540268739, 49.045718482, -3.955648076), z_dir=(0, -0.9459026548151283, 0.3244505626650883)), keep=Keep.TOP, mode=Mode.PRIVATE)
    add(fillet4_2_piece_2)
    with BuildSketch(Plane(origin=(-22.914170507, 25.402530662, 0), x_dir=(0, -1, 0), z_dir=(1, 0, 0))) as fillet4_2_piece_3:
        with BuildLine():
            CenterArc((FILLET4_R, FILLET4_R), FILLET4_R, 180, 90)
            Line((0, FILLET4_R), (0, 0))
            Line((0, 0), (FILLET4_R, 0))
        make_face()
    extrude(amount=36)
    with BuildSketch(Plane(origin=(-22.914170507, 27.402530662, 0), x_dir=(0, -1, 0), z_dir=(1, 0, 0))) as fillet4_2_piece_4:
        with BuildLine():
            CenterArc((2 + FILLET4_R, FILLET4_R), FILLET4_R, 180, 90)
            Line((2, FILLET4_R), (2, 0))
            Line((2, 0), (2 + FILLET4_R, 0))
        make_face()
    revolve(axis=Axis((-22.914170507, 27.402530662, 0), (0, 0, -1)), revolution_arc=90)
    with BuildSketch(Plane(origin=(13.085829493, 27.402530662, 0), x_dir=(1, 0, 0), z_dir=(0, 1, 0))) as fillet4_2_piece_5:
        with BuildLine():
            CenterArc((2 + FILLET4_R, FILLET4_R), FILLET4_R, 180, 90)
            Line((2, FILLET4_R), (2, 0))
            Line((2, 0), (2 + FILLET4_R, 0))
        make_face()
    revolve(axis=Axis((13.085829493, 27.402530662, 0), (0, 0, -1)), revolution_arc=90)


solid = part.part
